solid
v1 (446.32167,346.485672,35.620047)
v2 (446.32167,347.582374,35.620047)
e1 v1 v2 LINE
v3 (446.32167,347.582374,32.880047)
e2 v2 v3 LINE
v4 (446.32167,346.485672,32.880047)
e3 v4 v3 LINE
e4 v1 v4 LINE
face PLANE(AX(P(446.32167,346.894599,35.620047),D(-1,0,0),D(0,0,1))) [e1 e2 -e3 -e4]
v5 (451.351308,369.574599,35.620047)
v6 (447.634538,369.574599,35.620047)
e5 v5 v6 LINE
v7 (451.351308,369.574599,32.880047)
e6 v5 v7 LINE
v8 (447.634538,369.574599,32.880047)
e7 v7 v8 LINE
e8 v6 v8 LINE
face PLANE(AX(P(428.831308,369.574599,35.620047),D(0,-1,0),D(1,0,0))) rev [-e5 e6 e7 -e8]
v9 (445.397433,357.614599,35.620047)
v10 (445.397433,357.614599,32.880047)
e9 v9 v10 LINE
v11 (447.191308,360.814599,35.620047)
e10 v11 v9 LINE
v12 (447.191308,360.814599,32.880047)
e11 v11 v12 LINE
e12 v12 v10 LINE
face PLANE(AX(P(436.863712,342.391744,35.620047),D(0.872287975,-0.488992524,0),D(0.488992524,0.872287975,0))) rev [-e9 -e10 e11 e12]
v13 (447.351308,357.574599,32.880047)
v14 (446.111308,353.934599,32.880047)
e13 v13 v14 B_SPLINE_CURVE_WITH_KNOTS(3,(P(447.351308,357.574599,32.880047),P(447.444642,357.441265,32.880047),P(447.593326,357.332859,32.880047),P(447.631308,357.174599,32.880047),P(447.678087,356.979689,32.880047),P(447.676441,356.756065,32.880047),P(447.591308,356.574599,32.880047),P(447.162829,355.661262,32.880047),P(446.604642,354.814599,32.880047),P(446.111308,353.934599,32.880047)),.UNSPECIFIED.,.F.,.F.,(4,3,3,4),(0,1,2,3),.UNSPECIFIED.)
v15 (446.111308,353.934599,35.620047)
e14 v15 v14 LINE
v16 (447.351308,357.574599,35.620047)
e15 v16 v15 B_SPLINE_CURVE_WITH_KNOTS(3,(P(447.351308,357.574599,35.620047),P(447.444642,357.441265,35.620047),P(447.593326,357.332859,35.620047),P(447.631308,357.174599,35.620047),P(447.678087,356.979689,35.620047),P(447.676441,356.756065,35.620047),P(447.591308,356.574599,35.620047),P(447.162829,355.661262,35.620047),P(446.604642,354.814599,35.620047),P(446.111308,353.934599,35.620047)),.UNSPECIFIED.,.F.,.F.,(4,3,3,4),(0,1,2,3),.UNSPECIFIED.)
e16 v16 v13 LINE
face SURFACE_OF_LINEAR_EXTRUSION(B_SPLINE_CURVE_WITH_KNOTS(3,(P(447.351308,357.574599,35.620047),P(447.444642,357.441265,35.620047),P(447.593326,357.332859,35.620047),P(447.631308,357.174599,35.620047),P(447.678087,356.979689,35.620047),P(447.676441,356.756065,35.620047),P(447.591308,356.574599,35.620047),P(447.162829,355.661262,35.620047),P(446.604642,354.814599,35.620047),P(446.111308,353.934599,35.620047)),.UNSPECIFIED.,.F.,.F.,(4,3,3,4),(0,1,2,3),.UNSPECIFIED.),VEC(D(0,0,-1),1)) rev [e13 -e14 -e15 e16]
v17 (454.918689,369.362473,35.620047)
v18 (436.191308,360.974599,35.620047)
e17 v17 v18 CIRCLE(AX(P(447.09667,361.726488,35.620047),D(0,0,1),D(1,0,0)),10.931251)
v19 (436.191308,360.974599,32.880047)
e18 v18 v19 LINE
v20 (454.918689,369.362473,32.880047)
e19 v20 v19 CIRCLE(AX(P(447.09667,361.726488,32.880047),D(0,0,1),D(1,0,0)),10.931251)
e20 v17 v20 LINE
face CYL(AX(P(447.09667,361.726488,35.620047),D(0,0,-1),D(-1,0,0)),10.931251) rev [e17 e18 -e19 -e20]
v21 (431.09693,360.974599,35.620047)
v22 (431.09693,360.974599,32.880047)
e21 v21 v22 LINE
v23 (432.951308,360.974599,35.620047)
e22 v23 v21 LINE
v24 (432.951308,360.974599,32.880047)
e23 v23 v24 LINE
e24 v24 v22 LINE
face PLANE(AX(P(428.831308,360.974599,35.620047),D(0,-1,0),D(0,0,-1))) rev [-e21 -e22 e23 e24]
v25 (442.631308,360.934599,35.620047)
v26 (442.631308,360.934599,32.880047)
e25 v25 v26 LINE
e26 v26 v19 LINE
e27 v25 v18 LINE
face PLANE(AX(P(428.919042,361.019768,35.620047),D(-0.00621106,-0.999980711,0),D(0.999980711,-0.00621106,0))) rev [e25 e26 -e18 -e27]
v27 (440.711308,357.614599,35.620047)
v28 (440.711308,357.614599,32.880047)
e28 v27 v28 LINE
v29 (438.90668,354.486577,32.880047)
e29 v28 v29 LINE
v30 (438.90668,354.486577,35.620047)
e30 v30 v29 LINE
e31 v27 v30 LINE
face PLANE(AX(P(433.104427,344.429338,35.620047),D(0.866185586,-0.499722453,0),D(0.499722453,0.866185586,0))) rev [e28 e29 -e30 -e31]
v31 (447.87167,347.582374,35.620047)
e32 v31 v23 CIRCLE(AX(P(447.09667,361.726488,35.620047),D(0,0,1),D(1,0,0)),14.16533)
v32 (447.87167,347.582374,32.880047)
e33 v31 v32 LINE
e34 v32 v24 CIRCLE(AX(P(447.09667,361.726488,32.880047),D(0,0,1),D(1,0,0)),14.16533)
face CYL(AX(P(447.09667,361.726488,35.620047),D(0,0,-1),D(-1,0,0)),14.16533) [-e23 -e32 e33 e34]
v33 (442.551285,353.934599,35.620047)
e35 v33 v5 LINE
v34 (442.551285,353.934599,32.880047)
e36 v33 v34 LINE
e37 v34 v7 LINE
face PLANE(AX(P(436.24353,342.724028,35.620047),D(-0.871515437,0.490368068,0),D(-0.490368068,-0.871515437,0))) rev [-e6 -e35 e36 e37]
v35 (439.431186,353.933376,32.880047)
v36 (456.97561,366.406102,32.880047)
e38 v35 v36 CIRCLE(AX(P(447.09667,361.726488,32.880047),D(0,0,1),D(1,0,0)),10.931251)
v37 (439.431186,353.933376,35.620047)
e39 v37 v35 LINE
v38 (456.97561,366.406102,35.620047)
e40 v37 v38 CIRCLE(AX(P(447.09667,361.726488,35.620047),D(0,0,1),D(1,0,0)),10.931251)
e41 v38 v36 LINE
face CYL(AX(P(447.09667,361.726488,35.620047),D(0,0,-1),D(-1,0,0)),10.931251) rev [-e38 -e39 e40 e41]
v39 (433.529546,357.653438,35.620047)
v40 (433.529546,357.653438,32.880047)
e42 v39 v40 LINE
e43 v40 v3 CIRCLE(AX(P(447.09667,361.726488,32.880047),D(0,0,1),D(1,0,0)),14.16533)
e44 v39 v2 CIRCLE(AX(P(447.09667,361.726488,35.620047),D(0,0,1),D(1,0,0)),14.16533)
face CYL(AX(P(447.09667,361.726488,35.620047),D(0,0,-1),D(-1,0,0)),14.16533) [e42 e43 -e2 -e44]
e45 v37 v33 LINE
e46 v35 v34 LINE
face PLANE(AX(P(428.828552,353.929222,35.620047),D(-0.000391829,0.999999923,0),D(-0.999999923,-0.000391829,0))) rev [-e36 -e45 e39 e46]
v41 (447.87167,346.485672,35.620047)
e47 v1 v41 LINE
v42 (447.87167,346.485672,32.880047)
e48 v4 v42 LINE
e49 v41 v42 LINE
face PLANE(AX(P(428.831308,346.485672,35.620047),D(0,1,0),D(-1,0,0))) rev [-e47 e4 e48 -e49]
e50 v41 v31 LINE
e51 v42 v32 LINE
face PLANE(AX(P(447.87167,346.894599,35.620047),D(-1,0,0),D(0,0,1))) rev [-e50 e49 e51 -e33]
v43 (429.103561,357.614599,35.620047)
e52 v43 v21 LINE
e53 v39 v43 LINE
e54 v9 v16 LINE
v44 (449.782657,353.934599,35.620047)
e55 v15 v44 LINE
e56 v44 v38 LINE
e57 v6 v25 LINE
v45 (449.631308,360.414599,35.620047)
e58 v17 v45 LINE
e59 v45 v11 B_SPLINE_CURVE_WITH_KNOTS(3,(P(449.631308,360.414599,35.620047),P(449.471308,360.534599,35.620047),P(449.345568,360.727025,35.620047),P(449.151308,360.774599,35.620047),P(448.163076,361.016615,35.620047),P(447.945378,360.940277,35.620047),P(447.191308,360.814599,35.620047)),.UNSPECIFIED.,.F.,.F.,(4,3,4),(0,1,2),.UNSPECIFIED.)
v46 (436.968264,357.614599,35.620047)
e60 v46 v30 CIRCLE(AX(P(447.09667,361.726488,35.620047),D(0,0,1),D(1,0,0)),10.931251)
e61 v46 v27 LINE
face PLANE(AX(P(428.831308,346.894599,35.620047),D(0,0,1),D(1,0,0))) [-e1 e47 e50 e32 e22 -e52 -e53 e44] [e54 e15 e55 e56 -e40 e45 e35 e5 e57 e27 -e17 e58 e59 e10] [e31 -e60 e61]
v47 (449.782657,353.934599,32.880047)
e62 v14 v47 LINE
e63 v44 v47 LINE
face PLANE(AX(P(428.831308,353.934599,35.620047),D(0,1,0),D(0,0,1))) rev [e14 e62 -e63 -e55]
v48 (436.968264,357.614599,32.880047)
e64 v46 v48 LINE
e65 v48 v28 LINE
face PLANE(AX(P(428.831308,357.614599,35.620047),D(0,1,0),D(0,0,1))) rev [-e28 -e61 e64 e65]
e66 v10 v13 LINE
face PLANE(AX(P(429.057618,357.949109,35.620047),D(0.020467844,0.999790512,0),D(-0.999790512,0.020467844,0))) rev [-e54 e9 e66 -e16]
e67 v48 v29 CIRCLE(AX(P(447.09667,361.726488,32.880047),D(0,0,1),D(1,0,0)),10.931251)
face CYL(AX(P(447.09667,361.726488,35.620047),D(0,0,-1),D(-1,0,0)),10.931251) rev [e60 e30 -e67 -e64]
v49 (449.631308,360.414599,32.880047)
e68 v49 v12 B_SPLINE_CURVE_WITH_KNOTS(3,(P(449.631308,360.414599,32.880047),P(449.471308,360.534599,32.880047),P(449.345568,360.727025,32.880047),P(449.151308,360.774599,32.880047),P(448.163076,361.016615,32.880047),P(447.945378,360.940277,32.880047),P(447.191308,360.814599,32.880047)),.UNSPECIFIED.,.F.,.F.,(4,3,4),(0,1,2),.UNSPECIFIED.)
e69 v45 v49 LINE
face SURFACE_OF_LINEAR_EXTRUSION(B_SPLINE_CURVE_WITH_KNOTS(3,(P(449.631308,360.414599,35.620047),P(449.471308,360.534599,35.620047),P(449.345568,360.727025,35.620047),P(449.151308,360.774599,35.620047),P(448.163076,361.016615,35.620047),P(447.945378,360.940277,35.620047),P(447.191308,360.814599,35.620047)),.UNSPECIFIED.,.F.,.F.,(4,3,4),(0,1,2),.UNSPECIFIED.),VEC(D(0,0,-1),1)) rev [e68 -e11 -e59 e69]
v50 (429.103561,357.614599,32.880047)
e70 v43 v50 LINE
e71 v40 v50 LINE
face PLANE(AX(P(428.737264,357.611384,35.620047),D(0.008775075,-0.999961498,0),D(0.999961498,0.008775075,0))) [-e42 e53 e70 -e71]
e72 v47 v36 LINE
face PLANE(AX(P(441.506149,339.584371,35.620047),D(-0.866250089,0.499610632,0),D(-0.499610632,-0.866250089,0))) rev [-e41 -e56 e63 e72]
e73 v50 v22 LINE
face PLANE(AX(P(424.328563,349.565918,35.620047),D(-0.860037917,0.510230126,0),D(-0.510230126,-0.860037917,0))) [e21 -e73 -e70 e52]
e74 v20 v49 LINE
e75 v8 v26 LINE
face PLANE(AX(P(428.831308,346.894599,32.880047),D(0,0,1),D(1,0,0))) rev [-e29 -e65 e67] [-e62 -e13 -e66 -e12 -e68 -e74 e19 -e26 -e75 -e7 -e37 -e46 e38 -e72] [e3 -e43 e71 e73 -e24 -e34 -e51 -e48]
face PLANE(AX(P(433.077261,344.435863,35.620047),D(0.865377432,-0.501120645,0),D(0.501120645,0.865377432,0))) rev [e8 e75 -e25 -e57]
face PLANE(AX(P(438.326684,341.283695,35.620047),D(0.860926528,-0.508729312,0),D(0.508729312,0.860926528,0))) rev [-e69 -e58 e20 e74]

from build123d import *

# Parameters (mm, degrees)
BOSS_EXTRUDE1_DEPTH = 68.5
SCALE1_DEPTH        = 68.5
SCALE1_2_DEPTH      = 32.880047435
SCALE1_START        = 35.620047435
SCALE1_3_DEPTH      = 32.879952565
SCALE1_START_2      = 32.880047435
SCALE1_4_DEPTH      = 2.74


# Read off the part's stored shape, not the designer's step: Scale1
with BuildPart() as part:
    # Sketch1 → Boss-Extrude1 (new body)
    with BuildSketch(Plane.XY):
        with BuildLine():
            Line((6.806314099, 268.000000001), (117.455935844, 268.970996088))
            ThreePointArc((117.455935844, 268.970996088), (237.572521573, 92.54839531), (437.259031844, 17.194391779))
            Line((437.259031844, 17.194391779), (437.259031844, -10.223169449))
            Line((437.259031844, -10.223169449), (476.009031844, -10.223169449))
            Line((476.009031844, -10.223169449), (476.009031844, 17.194391779))
            ThreePointArc((476.009031844, 17.194391779), (693.184182798, 634.339249245), (103, 352))
            Line((103, 352), (56.640547879, 352))
            Line((56.640547879, 352), (6.806314099, 268.000000001))
        make_face()
        with BuildLine():
            ThreePointArc((251.884299831, 189.799453042), (224.339726467, 226.845833922), (203.423883848, 268.000000001))
            Line((203.423883848, 268.000000001), (297, 268.000000001))
            Line((297, 268.000000001), (251.884299831, 189.799453042))
        make_face(mode=Mode.SUBTRACT)
        with BuildLine():
            ThreePointArc((183.999999995, 352.000000012), (344.926101955, 620.204516968), (652.184505988, 561.696856288))
            Line((652.184505988, 561.696856288), (520, 338))
            add(Edge.make_bspline(
                [(520, 338), (516, 341), (512.856486558, 345.810656353), (508, 347), (483.294181497, 353.050404531), (477.851743634, 351.141957272), (459, 348)],
                knots=[0, 0, 0, 0, 1, 1, 1, 2, 2, 2, 2], degree=3))
            Line((459, 348), (414.15311107, 268.000000001))
            Line((414.15311107, 268.000000001), (463, 267))
            add(Edge.make_bspline(
                [(463, 267), (465.333333333, 263.666666667), (469.050440025, 260.956499894), (470, 257), (471.16945492, 252.127271165), (471.128314939, 246.536671316), (469, 242), (458.288028235, 219.166586501), (444.333333333, 198), (432, 176)],
                knots=[0, 0, 0, 0, 1, 1, 1, 2, 2, 2, 3, 3, 3, 3], degree=3))
            Line((432, 176), (523.783724069, 176))
            Line((523.783724069, 176), (703.607534398, 487.787583679))
            ThreePointArc((703.607534398, 487.787583679), (614.979125151, 148.065376335), (264.996930573, 175.96943637))
            Line((264.996930573, 175.96943637), (342.999405137, 176))
            Line((342.999405137, 176), (562.999999995, 567.000000012))
            Line((562.999999995, 567.000000012), (470.080751257, 567.000000012))
            Line((470.080751257, 567.000000012), (344.999999995, 351.000000012))
            Line((344.999999995, 351.000000012), (183.999999995, 352.000000012))
        make_face(mode=Mode.SUBTRACT)
    extrude(amount=BOSS_EXTRUDE1_DEPTH)

    # Scale1 outline → Scale1 (cut)
    # profile 1 of 3: a face of its own
    with BuildSketch(Plane.XY):
        with BuildLine():
            Line((56.640547879, 352), (6.806314099, 268.000000001))
            Line((6.806314099, 268.000000001), (117.455935844, 268.970996088))
            ThreePointArc((117.455935844, 268.970996088), (237.572521573, 92.54839531), (437.259031844, 17.194391779))
            Line((437.259031844, 17.194391779), (437.259031844, -10.223169449))
            Line((437.259031844, -10.223169449), (476.009031844, -10.223169449))
            Line((476.009031844, -10.223169449), (476.009031844, 17.194391779))
            ThreePointArc((476.009031844, 17.194391779), (693.184182798, 634.339249245), (103, 352))
            Line((103, 352), (56.640547879, 352))
        make_face()
        with BuildLine():
            Line((297, 268.000000001), (251.884299831, 189.799453042))
            ThreePointArc((251.884299831, 189.799453042), (224.339726467, 226.845833922), (203.423883848, 268.000000001))
            Line((203.423883848, 268.000000001), (297, 268.000000001))
        make_face(mode=Mode.SUBTRACT)
        with BuildLine():
            Line((342.999405137, 176), (440.459332473, 349.212402512))
            ThreePointArc((440.459332473, 349.212402512), (436.148252718, 352.738231864), (433.529545779, 357.653438395))
            Line((433.529545779, 357.653438395), (429.103560909, 357.614598551))
            Line((429.103560909, 357.614598551), (431.09693026, 360.974598551))
            Line((431.09693026, 360.974598551), (432.951308345, 360.974598551))
            ThreePointArc((432.951308345, 360.974598551), (439.774077465, 373.852337705), (454.347494733, 373.89538779))
            Line((454.347494733, 373.89538779), (562.999999995, 567.000000012))
            Line((562.999999995, 567.000000012), (470.080751257, 567.000000012))
            Line((470.080751257, 567.000000012), (344.999999995, 351.000000012))
            Line((344.999999995, 351.000000012), (183.999999995, 352.000000012))
            ThreePointArc((183.999999995, 352.000000012), (344.926101955, 620.204516968), (652.184505988, 561.696856288))
            Line((652.184505988, 561.696856288), (520, 338))
            add(Edge.make_bspline(
                [(520, 338), (516, 341), (512.856486558, 345.810656353), (508, 347), (483.294181497, 353.050404531), (477.851743634, 351.141957272), (459, 348)],
                knots=[0, 0, 0, 0, 1, 1, 1, 2, 2, 2, 2], degree=3))
            Line((459, 348), (414.15311107, 268.000000001))
            Line((414.15311107, 268.000000001), (463, 267))
            add(Edge.make_bspline(
                [(463, 267), (465.333333333, 263.666666667), (469.050440025, 260.956499894), (470, 257), (471.16945492, 252.127271165), (471.128314939, 246.536671316), (469, 242), (458.288028235, 219.166586501), (444.333333333, 198), (432, 176)],
                knots=[0, 0, 0, 0, 1, 1, 1, 2, 2, 2, 3, 3, 3, 3], degree=3))
            Line((432, 176), (523.783724069, 176))
            Line((523.783724069, 176), (703.607534398, 487.787583679))
            ThreePointArc((703.607534398, 487.787583679), (614.979125151, 148.065376335), (264.996930573, 175.96943637))
            Line((264.996930573, 175.96943637), (342.999405137, 176))
        make_face(mode=Mode.SUBTRACT)
    # profile 2 of 3: a face of its own
    with BuildSketch(Plane.XY):
        with BuildLine():
            ThreePointArc((436.968263699, 357.614598551), (437.804897404, 355.968431908), (438.906680338, 354.486576673))
            Line((438.906680338, 354.486576673), (440.711308345, 357.614598551))
            Line((440.711308345, 357.614598551), (436.968263699, 357.614598551))
        make_face()
    # profile 3 of 3: a face of its own
    with BuildSketch(Plane.XY):
        with BuildLine():
            ThreePointArc((439.431185568, 353.933376006), (440.667845198, 352.885534626), (442.04585661, 352.032080968))
            Line((442.04585661, 352.032080968), (452.760970596, 371.075709333))
            ThreePointArc((452.760970596, 371.075709333), (441.406740972, 371.060134505), (436.191308345, 360.974598552))
            Line((436.191308345, 360.974598552), (442.631308345, 360.934598552))
            Line((442.631308345, 360.934598552), (447.634538395, 369.574598552))
            Line((447.634538395, 369.574598552), (451.351308345, 369.574598552))
            Line((451.351308345, 369.574598552), (442.551284551, 353.934598551))
            Line((442.551284551, 353.934598551), (439.431185568, 353.933376006))
        make_face()
    extrude(amount=SCALE1_DEPTH, mode=Mode.SUBTRACT)

    # Scale1 2 outline → Scale1 2 (cut)
    with BuildSketch(Plane.XY):
        with BuildLine():
            Line((440.459332473, 349.212402512), (442.04585661, 352.032080968))
            ThreePointArc((442.04585661, 352.032080968), (440.667845198, 352.885534626), (439.431185568, 353.933376006))
            Line((439.431185568, 353.933376006), (442.551284551, 353.934598551))
            Line((442.551284551, 353.934598551), (451.351308345, 369.574598552))
            Line((451.351308345, 369.574598552), (447.634538395, 369.574598552))
            Line((447.634538395, 369.574598552), (442.631308345, 360.934598552))
            Line((442.631308345, 360.934598552), (436.191308345, 360.974598552))
            ThreePointArc((436.191308345, 360.974598552), (441.406740972, 371.060134505), (452.760970596, 371.075709333))
            Line((452.760970596, 371.075709333), (454.347494733, 373.89538779))
            ThreePointArc((454.347494733, 373.89538779), (439.774077465, 373.852337705), (432.951308345, 360.974598551))
            Line((432.951308345, 360.974598551), (431.09693026, 360.974598551))
            Line((431.09693026, 360.974598551), (429.103560909, 357.614598551))
            Line((429.103560909, 357.614598551), (433.529545779, 357.653438395))
            ThreePointArc((433.529545779, 357.653438395), (436.148252718, 352.738231864), (440.459332473, 349.212402512))
        make_face()
        with BuildLine():
            Line((440.711308345, 357.614598551), (438.906680338, 354.486576673))
            ThreePointArc((438.906680338, 354.486576673), (437.804897404, 355.968431908), (436.968263699, 357.614598551))
            Line((436.968263699, 357.614598551), (440.711308345, 357.614598551))
        make_face(mode=Mode.SUBTRACT)
    extrude(amount=SCALE1_2_DEPTH, mode=Mode.SUBTRACT)

    # Scale1 3 outline → Scale1 3 (cut)
    with BuildSketch(Plane.XY.offset(SCALE1_START)):
        with BuildLine():
            Line((440.459332473, 349.212402512), (442.04585661, 352.032080968))
            ThreePointArc((442.04585661, 352.032080968), (440.667845198, 352.885534626), (439.431185568, 353.933376006))
            Line((439.431185568, 353.933376006), (442.551284551, 353.934598551))
            Line((442.551284551, 353.934598551), (451.351308345, 369.574598552))
            Line((451.351308345, 369.574598552), (447.634538395, 369.574598552))
            Line((447.634538395, 369.574598552), (442.631308345, 360.934598552))
            Line((442.631308345, 360.934598552), (436.191308345, 360.974598552))
            ThreePointArc((436.191308345, 360.974598552), (441.406740972, 371.060134505), (452.760970596, 371.075709333))
            Line((452.760970596, 371.075709333), (454.347494733, 373.89538779))
            ThreePointArc((454.347494733, 373.89538779), (439.774077465, 373.852337705), (432.951308345, 360.974598551))
            Line((432.951308345, 360.974598551), (431.09693026, 360.974598551))
            Line((431.09693026, 360.974598551), (429.103560909, 357.614598551))
            Line((429.103560909, 357.614598551), (433.529545779, 357.653438395))
            ThreePointArc((433.529545779, 357.653438395), (436.148252718, 352.738231864), (440.459332473, 349.212402512))
        make_face()
        with BuildLine():
            Line((440.711308345, 357.614598551), (438.906680338, 354.486576673))
            ThreePointArc((438.906680338, 354.486576673), (437.804897404, 355.968431908), (436.968263699, 357.614598551))
            Line((436.968263699, 357.614598551), (440.711308345, 357.614598551))
        make_face(mode=Mode.SUBTRACT)
    extrude(amount=SCALE1_3_DEPTH, mode=Mode.SUBTRACT)

    # Scale1 4 outline → Scale1 4 (add)
    with BuildSketch(Plane.XY.offset(SCALE1_START_2)):
        with BuildLine():
            Line((445.397432788, 357.614598551), (447.351308345, 357.574598551))
            add(Edge.make_bspline(
                [(447.351308345, 357.574598551), (447.444641678, 357.441265218), (447.593325946, 357.332858547), (447.631308345, 357.174598551), (447.678086542, 356.979689398), (447.676440943, 356.756065404), (447.591308345, 356.574598551), (447.162829475, 355.661262011), (446.604641678, 354.814598551), (446.111308345, 353.934598551)],
                knots=[0, 0, 0, 0, 1, 1, 1, 2, 2, 2, 3, 3, 3, 3], degree=3))
            Line((446.111308345, 353.934598551), (449.782657308, 353.934598551))
            Line((449.782657308, 353.934598551), (456.975609721, 366.406101898))
            ThreePointArc((456.975609721, 366.406101898), (454.678280413, 353.851755114), (442.04585661, 352.032080968))
            Line((442.04585661, 352.032080968), (440.459332473, 349.212402512))
            ThreePointArc((440.459332473, 349.212402512), (443.301945183, 348.078900443), (446.321669619, 347.582374223))
            Line((446.321669619, 347.582374223), (446.321669619, 346.485671773))
            Line((446.321669619, 346.485671773), (447.871669619, 346.485671773))
            Line((447.871669619, 346.485671773), (447.871669619, 347.582374223))
            ThreePointArc((447.871669619, 347.582374223), (460.851564672, 358.341307853), (454.347494733, 373.89538779))
            Line((454.347494733, 373.89538779), (452.760970596, 371.075709333))
            ThreePointArc((452.760970596, 371.075709333), (453.894022137, 370.287343309), (454.918688585, 369.362472803))
            Line((454.918688585, 369.362472803), (449.631308345, 360.414598551))
            add(Edge.make_bspline(
                [(449.631308345, 360.414598551), (449.471308345, 360.534598551), (449.345567807, 360.727024805), (449.151308345, 360.774598551), (448.163075605, 361.016614733), (447.945378091, 360.940276842), (447.191308345, 360.814598551)],
                knots=[0, 0, 0, 0, 1, 1, 1, 2, 2, 2, 2], degree=3))
            Line((447.191308345, 360.814598551), (445.397432788, 357.614598551))
        make_face()
    extrude(amount=SCALE1_4_DEPTH)


solid = part.part
